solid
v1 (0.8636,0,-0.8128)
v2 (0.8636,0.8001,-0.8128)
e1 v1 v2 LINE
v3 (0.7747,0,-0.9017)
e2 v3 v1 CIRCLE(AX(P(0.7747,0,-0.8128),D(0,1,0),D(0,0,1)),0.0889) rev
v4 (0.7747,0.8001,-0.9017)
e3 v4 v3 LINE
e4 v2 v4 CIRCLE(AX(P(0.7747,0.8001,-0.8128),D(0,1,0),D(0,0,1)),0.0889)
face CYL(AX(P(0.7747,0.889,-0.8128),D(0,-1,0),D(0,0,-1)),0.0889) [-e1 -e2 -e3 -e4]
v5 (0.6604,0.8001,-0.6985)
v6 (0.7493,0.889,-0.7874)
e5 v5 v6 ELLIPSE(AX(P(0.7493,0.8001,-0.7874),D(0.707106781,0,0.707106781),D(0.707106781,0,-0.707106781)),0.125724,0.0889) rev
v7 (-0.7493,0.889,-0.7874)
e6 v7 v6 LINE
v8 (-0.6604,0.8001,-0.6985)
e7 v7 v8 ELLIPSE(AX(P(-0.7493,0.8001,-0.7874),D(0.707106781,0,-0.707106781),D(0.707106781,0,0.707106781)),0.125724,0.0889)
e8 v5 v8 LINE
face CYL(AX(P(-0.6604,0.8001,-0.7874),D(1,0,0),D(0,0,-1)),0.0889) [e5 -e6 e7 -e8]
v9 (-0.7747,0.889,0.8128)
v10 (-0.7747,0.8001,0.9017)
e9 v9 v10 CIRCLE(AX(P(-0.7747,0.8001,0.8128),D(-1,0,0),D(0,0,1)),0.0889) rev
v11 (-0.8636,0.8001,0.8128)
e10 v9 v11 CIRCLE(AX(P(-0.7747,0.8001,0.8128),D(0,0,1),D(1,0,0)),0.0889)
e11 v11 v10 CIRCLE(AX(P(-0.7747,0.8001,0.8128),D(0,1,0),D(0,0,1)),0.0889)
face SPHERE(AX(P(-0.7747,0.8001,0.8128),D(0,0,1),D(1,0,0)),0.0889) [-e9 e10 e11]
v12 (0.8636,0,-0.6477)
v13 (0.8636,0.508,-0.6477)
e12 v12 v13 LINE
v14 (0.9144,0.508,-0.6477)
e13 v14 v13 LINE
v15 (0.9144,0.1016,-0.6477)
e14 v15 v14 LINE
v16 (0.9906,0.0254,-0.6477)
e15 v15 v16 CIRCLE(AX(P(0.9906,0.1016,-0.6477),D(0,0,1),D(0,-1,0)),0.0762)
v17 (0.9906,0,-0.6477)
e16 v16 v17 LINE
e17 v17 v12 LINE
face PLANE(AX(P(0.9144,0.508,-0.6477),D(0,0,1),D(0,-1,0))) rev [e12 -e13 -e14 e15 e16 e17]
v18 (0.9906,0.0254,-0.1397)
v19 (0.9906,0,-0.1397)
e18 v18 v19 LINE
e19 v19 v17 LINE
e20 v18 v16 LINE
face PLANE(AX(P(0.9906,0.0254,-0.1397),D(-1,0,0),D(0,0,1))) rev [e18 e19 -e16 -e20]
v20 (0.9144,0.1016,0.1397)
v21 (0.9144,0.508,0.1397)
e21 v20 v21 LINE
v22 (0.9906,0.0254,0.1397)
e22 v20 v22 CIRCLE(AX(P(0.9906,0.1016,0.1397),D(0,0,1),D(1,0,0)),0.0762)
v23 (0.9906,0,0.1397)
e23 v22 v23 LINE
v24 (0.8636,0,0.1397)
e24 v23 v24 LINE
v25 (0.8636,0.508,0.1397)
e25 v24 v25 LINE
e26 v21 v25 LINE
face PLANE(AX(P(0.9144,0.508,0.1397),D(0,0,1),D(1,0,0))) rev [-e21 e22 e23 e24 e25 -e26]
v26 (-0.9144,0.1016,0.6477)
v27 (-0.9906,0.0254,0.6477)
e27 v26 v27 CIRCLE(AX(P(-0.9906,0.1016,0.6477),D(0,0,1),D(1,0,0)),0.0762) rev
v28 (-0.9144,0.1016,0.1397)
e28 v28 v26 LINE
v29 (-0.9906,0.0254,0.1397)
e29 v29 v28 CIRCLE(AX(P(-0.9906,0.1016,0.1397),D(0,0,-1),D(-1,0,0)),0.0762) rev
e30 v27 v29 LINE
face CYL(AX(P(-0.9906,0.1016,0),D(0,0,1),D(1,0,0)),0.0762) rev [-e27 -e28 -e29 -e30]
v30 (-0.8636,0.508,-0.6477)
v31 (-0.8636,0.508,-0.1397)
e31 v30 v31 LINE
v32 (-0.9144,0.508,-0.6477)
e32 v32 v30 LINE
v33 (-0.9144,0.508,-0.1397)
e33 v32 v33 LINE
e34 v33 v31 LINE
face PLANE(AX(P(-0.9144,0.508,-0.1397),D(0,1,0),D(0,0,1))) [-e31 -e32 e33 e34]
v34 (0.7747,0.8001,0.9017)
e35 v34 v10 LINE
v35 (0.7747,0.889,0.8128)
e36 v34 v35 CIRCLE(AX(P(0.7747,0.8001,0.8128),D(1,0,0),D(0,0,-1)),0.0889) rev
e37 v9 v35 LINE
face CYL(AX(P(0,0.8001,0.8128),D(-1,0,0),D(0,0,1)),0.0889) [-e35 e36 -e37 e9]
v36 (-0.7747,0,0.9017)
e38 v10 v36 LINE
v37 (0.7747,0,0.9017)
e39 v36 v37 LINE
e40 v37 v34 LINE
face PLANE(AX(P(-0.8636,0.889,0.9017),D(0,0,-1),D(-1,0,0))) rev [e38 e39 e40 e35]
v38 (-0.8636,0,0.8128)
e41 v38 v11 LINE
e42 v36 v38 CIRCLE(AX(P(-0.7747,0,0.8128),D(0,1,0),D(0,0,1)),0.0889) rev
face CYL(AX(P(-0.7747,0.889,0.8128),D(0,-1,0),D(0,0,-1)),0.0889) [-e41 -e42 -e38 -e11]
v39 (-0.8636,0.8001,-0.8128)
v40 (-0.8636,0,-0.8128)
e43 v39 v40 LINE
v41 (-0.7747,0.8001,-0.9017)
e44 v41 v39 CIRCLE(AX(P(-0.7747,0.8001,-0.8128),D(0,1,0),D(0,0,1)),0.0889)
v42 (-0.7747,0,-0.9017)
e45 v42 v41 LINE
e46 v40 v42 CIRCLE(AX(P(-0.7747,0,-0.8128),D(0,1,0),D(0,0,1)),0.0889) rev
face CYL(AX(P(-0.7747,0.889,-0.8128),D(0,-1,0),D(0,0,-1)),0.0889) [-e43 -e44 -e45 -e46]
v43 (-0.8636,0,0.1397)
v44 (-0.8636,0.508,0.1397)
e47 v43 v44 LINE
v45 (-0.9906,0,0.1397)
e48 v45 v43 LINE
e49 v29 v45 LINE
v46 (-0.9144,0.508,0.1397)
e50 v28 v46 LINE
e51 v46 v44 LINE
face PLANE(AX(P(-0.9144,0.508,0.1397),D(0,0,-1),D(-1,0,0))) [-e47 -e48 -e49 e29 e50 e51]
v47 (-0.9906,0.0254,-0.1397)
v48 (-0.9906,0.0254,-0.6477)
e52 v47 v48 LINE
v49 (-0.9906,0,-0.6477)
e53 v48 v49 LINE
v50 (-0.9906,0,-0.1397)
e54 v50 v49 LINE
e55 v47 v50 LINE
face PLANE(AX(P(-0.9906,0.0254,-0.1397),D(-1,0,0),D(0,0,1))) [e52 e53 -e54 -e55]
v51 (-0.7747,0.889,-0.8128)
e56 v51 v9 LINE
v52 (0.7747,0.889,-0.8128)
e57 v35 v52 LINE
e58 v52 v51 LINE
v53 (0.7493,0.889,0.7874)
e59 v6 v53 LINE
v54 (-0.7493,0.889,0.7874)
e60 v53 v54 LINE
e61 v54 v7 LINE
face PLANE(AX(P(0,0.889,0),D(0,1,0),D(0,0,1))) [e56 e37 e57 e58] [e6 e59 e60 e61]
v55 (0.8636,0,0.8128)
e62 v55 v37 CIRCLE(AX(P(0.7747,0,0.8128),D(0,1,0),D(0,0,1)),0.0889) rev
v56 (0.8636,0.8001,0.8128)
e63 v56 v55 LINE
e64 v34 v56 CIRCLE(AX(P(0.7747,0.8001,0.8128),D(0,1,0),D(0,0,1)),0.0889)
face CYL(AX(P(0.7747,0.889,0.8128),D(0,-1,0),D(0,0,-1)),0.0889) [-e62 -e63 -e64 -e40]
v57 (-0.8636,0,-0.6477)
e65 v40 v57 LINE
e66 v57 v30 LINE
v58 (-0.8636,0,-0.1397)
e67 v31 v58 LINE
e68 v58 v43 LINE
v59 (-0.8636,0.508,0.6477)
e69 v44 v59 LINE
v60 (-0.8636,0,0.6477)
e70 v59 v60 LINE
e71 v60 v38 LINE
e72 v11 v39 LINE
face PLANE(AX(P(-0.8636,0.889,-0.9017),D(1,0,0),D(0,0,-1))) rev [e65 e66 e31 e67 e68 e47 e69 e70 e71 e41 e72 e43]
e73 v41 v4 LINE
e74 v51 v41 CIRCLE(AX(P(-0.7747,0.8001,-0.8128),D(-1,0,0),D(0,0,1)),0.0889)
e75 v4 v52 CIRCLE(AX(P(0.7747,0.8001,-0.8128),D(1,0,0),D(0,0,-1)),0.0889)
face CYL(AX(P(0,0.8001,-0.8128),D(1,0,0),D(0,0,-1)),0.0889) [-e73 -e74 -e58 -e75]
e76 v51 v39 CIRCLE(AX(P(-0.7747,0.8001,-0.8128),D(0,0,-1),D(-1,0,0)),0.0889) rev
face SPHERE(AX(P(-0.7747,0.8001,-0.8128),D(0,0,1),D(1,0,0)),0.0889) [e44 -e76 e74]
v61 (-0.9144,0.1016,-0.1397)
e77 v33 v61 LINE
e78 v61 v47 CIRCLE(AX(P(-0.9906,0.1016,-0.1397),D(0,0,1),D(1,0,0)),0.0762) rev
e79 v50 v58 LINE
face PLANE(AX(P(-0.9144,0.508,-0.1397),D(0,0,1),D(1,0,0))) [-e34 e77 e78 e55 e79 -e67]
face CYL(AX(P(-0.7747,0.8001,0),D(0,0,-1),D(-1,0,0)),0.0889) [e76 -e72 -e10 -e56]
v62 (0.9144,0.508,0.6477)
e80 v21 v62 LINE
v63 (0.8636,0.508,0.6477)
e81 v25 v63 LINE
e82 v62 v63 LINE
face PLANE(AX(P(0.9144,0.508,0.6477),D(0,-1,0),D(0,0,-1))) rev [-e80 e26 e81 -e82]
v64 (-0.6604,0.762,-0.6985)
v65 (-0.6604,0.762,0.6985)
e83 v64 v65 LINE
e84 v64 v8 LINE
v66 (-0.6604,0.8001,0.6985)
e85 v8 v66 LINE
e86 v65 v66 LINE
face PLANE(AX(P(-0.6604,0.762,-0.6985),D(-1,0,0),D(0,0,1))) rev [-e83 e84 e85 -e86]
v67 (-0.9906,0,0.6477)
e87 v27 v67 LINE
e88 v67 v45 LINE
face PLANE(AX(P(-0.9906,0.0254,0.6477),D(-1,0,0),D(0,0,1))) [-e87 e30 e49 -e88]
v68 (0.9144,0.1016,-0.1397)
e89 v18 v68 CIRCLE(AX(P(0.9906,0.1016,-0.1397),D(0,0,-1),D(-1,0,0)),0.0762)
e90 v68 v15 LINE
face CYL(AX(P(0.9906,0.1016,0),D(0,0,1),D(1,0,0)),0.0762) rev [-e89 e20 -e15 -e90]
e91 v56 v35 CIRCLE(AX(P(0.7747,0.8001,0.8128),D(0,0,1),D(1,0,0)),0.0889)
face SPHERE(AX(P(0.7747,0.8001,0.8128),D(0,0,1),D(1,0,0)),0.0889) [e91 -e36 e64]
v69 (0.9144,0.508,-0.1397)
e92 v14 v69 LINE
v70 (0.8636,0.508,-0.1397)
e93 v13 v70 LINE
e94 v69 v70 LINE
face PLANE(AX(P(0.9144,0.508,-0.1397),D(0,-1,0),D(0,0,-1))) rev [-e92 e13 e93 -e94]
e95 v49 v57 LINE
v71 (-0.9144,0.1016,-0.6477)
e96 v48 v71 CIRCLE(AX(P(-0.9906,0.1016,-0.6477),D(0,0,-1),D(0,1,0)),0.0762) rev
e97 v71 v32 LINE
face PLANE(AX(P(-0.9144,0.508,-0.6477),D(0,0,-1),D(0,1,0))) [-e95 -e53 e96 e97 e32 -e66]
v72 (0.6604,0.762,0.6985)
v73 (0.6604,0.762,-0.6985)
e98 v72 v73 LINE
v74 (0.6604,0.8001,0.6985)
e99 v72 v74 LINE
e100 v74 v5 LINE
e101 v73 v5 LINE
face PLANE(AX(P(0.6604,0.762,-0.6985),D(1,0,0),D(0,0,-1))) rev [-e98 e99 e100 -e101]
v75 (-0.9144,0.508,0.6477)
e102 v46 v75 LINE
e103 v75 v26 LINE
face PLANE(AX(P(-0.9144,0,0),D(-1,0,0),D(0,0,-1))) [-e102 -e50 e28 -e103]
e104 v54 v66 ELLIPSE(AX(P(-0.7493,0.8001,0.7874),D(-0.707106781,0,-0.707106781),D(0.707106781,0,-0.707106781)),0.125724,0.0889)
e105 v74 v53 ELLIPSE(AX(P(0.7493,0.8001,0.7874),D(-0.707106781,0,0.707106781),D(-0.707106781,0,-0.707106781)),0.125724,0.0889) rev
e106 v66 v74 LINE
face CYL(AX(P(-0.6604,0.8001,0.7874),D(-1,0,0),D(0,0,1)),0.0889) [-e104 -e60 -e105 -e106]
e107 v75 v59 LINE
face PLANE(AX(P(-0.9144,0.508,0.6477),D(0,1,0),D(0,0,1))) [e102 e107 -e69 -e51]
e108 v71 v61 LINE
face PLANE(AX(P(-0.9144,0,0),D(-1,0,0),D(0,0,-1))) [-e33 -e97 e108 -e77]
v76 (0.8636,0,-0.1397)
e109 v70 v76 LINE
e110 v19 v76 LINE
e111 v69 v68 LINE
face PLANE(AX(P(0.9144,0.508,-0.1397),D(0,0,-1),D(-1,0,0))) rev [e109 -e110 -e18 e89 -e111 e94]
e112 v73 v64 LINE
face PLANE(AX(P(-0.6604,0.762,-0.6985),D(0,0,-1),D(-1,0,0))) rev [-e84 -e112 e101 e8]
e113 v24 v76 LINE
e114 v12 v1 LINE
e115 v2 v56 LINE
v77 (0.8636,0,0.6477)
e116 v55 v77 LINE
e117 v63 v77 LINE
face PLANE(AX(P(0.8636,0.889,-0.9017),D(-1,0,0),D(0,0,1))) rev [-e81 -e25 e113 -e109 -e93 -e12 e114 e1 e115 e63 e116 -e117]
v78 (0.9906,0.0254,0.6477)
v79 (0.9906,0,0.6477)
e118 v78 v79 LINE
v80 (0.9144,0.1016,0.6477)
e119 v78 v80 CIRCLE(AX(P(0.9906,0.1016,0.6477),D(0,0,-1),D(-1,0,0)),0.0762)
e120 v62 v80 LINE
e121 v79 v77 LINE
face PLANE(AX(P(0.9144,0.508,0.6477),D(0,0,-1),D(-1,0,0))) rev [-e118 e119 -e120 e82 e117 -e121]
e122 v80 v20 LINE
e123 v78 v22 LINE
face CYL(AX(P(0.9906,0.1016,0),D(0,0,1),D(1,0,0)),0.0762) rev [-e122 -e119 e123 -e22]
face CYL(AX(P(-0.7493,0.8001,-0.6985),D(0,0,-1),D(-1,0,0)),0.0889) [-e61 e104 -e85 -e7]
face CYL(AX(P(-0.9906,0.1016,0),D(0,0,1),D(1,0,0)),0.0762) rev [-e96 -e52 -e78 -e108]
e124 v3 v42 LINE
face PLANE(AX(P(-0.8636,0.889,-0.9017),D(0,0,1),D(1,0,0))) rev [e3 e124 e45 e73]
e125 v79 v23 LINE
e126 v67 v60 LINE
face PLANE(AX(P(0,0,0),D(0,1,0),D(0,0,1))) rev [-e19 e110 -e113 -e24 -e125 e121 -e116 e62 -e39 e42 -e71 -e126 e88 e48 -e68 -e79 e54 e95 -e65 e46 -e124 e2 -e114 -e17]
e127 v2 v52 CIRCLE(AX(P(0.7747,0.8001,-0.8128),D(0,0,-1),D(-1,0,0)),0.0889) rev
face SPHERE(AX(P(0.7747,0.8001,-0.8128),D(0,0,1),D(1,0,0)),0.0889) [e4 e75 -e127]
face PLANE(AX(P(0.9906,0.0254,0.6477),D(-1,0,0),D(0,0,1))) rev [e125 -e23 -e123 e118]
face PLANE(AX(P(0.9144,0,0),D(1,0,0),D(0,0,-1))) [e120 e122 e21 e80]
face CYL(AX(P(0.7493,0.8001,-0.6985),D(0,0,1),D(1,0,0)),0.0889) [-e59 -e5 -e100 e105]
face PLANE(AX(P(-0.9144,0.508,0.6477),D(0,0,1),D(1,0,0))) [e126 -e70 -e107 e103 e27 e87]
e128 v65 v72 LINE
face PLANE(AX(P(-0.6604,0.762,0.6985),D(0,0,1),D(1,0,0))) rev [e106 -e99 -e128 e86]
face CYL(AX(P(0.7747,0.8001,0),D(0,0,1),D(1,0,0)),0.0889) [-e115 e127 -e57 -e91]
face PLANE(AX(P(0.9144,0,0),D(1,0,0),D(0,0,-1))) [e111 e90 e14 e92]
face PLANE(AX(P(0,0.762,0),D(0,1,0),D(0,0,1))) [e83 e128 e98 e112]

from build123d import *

# Parameters (mm, degrees)
SKETCH1_W            = 1.7272
SKETCH1_H            = 1.8034
BOSS_EXTRUDE1_DEPTH  = 0.889
SKETCH2_W            = 1.3208
SKETCH2_H            = 1.397
CUT_EXTRUDE1_DEPTH   = 0.127
FILLET1_R            = 0.0889
SKETCH3_W            = 0.508
SKETCH3_H            = 0.508
BOSS_EXTRUDE2_DEPTH  = 0.0508
SKETCH4_W            = 0.0762
SKETCH4_H            = 0.508
BOSS_EXTRUDE3_DEPTH  = 0.0254
FILLET2_R            = 0.0762
FILLET2_OF_MIRROR1_R = 0.0762


with BuildPart() as part:
    # Sketch1 → Boss-Extrude1 (new body)
    with BuildSketch(Plane(origin=(0, 0, 0), x_dir=(1, 0, 0), z_dir=(0, 1, 0))):
        Rectangle(SKETCH1_W, SKETCH1_H)
    extrude(amount=BOSS_EXTRUDE1_DEPTH)

    # Sketch2 → Cut-Extrude1 (cut)
    with BuildSketch(Plane(origin=(0, 0.889, 0), x_dir=(1, 0, 0), z_dir=(0, 1, 0))):
        Rectangle(SKETCH2_W, SKETCH2_H)
    extrude(amount=-CUT_EXTRUDE1_DEPTH, mode=Mode.SUBTRACT)

    # Fillet1
    fillet1_edges = [part.edges().sort_by_distance(p)[0] for p in [
        (-0.8636, 0.889, 0),
        (0, 0.889, 0.9017),
        (0.6604, 0.889, 0),
        (0, 0.889, -0.6985),
        (-0.6604, 0.889, 0),
        (0, 0.889, 0.6985),
        (0.8636, 0.889, 0),
        (0, 0.889, -0.9017),
        (0.8636, 0.4445, 0.9017),
        (-0.8636, 0.4445, 0.9017),
        (-0.8636, 0.4445, -0.9017),
        (0.8636, 0.4445, -0.9017),
    ]]
    fillet(fillet1_edges, radius=FILLET1_R)

    # Sketch3 → Boss-Extrude2 (add)
    with BuildSketch(Plane(origin=(0.8636, 0, 0), x_dir=(0, 0, -1), z_dir=(1, 0, 0))):
        with Locations((-0.3937, 0.254)):
            Rectangle(SKETCH3_W, SKETCH3_H)
        with Locations((0.3937, 0.254)):
            Rectangle(SKETCH3_W, SKETCH3_H)
    boss_extrude2 = extrude(amount=BOSS_EXTRUDE2_DEPTH)

    # Sketch4 → Boss-Extrude3 (add)
    with BuildSketch(Plane(origin=(0, 0, 0), x_dir=(1, 0, 0), z_dir=(0, 1, 0))):
        with Locations((0.9525, -0.3937)):
            Rectangle(SKETCH4_W, SKETCH4_H)
        with Locations((0.9525, 0.3937)):
            Rectangle(SKETCH4_W, SKETCH4_H)
    boss_extrude3 = extrude(amount=BOSS_EXTRUDE3_DEPTH)

    # Fillet2
    fillet2_edges = [part.edges().sort_by_distance(p)[0] for p in [
        (0.9144, 0.0254, 0.3937),
        (0.9144, 0.0254, -0.3937),
    ]]
    fillet(fillet2_edges, radius=FILLET2_R - 0.0001)  # a hair under: the kernel refuses the full size

    # Mirror1: Boss-Extrude2, Boss-Extrude3 across plane
    add(boss_extrude2.mirror(Plane(origin=(0, 0, 0), x_dir=(0, 0, 1), z_dir=(1, 0, 0))))
    add(boss_extrude3.mirror(Plane(origin=(0, 0, 0), x_dir=(0, 0, 1), z_dir=(1, 0, 0))))

    # Fillet2 of Mirror1
    fillet2_of_mirror1_edges = [part.edges().sort_by_distance(p)[0] for p in [
        (-0.9144, 0.0254, 0.3937),
        (-0.9144, 0.0254, -0.3937),
    ]]
    fillet(fillet2_of_mirror1_edges, radius=FILLET2_OF_MIRROR1_R - 0.0001)  # a hair under: the kernel refuses the full size


solid = part.part
